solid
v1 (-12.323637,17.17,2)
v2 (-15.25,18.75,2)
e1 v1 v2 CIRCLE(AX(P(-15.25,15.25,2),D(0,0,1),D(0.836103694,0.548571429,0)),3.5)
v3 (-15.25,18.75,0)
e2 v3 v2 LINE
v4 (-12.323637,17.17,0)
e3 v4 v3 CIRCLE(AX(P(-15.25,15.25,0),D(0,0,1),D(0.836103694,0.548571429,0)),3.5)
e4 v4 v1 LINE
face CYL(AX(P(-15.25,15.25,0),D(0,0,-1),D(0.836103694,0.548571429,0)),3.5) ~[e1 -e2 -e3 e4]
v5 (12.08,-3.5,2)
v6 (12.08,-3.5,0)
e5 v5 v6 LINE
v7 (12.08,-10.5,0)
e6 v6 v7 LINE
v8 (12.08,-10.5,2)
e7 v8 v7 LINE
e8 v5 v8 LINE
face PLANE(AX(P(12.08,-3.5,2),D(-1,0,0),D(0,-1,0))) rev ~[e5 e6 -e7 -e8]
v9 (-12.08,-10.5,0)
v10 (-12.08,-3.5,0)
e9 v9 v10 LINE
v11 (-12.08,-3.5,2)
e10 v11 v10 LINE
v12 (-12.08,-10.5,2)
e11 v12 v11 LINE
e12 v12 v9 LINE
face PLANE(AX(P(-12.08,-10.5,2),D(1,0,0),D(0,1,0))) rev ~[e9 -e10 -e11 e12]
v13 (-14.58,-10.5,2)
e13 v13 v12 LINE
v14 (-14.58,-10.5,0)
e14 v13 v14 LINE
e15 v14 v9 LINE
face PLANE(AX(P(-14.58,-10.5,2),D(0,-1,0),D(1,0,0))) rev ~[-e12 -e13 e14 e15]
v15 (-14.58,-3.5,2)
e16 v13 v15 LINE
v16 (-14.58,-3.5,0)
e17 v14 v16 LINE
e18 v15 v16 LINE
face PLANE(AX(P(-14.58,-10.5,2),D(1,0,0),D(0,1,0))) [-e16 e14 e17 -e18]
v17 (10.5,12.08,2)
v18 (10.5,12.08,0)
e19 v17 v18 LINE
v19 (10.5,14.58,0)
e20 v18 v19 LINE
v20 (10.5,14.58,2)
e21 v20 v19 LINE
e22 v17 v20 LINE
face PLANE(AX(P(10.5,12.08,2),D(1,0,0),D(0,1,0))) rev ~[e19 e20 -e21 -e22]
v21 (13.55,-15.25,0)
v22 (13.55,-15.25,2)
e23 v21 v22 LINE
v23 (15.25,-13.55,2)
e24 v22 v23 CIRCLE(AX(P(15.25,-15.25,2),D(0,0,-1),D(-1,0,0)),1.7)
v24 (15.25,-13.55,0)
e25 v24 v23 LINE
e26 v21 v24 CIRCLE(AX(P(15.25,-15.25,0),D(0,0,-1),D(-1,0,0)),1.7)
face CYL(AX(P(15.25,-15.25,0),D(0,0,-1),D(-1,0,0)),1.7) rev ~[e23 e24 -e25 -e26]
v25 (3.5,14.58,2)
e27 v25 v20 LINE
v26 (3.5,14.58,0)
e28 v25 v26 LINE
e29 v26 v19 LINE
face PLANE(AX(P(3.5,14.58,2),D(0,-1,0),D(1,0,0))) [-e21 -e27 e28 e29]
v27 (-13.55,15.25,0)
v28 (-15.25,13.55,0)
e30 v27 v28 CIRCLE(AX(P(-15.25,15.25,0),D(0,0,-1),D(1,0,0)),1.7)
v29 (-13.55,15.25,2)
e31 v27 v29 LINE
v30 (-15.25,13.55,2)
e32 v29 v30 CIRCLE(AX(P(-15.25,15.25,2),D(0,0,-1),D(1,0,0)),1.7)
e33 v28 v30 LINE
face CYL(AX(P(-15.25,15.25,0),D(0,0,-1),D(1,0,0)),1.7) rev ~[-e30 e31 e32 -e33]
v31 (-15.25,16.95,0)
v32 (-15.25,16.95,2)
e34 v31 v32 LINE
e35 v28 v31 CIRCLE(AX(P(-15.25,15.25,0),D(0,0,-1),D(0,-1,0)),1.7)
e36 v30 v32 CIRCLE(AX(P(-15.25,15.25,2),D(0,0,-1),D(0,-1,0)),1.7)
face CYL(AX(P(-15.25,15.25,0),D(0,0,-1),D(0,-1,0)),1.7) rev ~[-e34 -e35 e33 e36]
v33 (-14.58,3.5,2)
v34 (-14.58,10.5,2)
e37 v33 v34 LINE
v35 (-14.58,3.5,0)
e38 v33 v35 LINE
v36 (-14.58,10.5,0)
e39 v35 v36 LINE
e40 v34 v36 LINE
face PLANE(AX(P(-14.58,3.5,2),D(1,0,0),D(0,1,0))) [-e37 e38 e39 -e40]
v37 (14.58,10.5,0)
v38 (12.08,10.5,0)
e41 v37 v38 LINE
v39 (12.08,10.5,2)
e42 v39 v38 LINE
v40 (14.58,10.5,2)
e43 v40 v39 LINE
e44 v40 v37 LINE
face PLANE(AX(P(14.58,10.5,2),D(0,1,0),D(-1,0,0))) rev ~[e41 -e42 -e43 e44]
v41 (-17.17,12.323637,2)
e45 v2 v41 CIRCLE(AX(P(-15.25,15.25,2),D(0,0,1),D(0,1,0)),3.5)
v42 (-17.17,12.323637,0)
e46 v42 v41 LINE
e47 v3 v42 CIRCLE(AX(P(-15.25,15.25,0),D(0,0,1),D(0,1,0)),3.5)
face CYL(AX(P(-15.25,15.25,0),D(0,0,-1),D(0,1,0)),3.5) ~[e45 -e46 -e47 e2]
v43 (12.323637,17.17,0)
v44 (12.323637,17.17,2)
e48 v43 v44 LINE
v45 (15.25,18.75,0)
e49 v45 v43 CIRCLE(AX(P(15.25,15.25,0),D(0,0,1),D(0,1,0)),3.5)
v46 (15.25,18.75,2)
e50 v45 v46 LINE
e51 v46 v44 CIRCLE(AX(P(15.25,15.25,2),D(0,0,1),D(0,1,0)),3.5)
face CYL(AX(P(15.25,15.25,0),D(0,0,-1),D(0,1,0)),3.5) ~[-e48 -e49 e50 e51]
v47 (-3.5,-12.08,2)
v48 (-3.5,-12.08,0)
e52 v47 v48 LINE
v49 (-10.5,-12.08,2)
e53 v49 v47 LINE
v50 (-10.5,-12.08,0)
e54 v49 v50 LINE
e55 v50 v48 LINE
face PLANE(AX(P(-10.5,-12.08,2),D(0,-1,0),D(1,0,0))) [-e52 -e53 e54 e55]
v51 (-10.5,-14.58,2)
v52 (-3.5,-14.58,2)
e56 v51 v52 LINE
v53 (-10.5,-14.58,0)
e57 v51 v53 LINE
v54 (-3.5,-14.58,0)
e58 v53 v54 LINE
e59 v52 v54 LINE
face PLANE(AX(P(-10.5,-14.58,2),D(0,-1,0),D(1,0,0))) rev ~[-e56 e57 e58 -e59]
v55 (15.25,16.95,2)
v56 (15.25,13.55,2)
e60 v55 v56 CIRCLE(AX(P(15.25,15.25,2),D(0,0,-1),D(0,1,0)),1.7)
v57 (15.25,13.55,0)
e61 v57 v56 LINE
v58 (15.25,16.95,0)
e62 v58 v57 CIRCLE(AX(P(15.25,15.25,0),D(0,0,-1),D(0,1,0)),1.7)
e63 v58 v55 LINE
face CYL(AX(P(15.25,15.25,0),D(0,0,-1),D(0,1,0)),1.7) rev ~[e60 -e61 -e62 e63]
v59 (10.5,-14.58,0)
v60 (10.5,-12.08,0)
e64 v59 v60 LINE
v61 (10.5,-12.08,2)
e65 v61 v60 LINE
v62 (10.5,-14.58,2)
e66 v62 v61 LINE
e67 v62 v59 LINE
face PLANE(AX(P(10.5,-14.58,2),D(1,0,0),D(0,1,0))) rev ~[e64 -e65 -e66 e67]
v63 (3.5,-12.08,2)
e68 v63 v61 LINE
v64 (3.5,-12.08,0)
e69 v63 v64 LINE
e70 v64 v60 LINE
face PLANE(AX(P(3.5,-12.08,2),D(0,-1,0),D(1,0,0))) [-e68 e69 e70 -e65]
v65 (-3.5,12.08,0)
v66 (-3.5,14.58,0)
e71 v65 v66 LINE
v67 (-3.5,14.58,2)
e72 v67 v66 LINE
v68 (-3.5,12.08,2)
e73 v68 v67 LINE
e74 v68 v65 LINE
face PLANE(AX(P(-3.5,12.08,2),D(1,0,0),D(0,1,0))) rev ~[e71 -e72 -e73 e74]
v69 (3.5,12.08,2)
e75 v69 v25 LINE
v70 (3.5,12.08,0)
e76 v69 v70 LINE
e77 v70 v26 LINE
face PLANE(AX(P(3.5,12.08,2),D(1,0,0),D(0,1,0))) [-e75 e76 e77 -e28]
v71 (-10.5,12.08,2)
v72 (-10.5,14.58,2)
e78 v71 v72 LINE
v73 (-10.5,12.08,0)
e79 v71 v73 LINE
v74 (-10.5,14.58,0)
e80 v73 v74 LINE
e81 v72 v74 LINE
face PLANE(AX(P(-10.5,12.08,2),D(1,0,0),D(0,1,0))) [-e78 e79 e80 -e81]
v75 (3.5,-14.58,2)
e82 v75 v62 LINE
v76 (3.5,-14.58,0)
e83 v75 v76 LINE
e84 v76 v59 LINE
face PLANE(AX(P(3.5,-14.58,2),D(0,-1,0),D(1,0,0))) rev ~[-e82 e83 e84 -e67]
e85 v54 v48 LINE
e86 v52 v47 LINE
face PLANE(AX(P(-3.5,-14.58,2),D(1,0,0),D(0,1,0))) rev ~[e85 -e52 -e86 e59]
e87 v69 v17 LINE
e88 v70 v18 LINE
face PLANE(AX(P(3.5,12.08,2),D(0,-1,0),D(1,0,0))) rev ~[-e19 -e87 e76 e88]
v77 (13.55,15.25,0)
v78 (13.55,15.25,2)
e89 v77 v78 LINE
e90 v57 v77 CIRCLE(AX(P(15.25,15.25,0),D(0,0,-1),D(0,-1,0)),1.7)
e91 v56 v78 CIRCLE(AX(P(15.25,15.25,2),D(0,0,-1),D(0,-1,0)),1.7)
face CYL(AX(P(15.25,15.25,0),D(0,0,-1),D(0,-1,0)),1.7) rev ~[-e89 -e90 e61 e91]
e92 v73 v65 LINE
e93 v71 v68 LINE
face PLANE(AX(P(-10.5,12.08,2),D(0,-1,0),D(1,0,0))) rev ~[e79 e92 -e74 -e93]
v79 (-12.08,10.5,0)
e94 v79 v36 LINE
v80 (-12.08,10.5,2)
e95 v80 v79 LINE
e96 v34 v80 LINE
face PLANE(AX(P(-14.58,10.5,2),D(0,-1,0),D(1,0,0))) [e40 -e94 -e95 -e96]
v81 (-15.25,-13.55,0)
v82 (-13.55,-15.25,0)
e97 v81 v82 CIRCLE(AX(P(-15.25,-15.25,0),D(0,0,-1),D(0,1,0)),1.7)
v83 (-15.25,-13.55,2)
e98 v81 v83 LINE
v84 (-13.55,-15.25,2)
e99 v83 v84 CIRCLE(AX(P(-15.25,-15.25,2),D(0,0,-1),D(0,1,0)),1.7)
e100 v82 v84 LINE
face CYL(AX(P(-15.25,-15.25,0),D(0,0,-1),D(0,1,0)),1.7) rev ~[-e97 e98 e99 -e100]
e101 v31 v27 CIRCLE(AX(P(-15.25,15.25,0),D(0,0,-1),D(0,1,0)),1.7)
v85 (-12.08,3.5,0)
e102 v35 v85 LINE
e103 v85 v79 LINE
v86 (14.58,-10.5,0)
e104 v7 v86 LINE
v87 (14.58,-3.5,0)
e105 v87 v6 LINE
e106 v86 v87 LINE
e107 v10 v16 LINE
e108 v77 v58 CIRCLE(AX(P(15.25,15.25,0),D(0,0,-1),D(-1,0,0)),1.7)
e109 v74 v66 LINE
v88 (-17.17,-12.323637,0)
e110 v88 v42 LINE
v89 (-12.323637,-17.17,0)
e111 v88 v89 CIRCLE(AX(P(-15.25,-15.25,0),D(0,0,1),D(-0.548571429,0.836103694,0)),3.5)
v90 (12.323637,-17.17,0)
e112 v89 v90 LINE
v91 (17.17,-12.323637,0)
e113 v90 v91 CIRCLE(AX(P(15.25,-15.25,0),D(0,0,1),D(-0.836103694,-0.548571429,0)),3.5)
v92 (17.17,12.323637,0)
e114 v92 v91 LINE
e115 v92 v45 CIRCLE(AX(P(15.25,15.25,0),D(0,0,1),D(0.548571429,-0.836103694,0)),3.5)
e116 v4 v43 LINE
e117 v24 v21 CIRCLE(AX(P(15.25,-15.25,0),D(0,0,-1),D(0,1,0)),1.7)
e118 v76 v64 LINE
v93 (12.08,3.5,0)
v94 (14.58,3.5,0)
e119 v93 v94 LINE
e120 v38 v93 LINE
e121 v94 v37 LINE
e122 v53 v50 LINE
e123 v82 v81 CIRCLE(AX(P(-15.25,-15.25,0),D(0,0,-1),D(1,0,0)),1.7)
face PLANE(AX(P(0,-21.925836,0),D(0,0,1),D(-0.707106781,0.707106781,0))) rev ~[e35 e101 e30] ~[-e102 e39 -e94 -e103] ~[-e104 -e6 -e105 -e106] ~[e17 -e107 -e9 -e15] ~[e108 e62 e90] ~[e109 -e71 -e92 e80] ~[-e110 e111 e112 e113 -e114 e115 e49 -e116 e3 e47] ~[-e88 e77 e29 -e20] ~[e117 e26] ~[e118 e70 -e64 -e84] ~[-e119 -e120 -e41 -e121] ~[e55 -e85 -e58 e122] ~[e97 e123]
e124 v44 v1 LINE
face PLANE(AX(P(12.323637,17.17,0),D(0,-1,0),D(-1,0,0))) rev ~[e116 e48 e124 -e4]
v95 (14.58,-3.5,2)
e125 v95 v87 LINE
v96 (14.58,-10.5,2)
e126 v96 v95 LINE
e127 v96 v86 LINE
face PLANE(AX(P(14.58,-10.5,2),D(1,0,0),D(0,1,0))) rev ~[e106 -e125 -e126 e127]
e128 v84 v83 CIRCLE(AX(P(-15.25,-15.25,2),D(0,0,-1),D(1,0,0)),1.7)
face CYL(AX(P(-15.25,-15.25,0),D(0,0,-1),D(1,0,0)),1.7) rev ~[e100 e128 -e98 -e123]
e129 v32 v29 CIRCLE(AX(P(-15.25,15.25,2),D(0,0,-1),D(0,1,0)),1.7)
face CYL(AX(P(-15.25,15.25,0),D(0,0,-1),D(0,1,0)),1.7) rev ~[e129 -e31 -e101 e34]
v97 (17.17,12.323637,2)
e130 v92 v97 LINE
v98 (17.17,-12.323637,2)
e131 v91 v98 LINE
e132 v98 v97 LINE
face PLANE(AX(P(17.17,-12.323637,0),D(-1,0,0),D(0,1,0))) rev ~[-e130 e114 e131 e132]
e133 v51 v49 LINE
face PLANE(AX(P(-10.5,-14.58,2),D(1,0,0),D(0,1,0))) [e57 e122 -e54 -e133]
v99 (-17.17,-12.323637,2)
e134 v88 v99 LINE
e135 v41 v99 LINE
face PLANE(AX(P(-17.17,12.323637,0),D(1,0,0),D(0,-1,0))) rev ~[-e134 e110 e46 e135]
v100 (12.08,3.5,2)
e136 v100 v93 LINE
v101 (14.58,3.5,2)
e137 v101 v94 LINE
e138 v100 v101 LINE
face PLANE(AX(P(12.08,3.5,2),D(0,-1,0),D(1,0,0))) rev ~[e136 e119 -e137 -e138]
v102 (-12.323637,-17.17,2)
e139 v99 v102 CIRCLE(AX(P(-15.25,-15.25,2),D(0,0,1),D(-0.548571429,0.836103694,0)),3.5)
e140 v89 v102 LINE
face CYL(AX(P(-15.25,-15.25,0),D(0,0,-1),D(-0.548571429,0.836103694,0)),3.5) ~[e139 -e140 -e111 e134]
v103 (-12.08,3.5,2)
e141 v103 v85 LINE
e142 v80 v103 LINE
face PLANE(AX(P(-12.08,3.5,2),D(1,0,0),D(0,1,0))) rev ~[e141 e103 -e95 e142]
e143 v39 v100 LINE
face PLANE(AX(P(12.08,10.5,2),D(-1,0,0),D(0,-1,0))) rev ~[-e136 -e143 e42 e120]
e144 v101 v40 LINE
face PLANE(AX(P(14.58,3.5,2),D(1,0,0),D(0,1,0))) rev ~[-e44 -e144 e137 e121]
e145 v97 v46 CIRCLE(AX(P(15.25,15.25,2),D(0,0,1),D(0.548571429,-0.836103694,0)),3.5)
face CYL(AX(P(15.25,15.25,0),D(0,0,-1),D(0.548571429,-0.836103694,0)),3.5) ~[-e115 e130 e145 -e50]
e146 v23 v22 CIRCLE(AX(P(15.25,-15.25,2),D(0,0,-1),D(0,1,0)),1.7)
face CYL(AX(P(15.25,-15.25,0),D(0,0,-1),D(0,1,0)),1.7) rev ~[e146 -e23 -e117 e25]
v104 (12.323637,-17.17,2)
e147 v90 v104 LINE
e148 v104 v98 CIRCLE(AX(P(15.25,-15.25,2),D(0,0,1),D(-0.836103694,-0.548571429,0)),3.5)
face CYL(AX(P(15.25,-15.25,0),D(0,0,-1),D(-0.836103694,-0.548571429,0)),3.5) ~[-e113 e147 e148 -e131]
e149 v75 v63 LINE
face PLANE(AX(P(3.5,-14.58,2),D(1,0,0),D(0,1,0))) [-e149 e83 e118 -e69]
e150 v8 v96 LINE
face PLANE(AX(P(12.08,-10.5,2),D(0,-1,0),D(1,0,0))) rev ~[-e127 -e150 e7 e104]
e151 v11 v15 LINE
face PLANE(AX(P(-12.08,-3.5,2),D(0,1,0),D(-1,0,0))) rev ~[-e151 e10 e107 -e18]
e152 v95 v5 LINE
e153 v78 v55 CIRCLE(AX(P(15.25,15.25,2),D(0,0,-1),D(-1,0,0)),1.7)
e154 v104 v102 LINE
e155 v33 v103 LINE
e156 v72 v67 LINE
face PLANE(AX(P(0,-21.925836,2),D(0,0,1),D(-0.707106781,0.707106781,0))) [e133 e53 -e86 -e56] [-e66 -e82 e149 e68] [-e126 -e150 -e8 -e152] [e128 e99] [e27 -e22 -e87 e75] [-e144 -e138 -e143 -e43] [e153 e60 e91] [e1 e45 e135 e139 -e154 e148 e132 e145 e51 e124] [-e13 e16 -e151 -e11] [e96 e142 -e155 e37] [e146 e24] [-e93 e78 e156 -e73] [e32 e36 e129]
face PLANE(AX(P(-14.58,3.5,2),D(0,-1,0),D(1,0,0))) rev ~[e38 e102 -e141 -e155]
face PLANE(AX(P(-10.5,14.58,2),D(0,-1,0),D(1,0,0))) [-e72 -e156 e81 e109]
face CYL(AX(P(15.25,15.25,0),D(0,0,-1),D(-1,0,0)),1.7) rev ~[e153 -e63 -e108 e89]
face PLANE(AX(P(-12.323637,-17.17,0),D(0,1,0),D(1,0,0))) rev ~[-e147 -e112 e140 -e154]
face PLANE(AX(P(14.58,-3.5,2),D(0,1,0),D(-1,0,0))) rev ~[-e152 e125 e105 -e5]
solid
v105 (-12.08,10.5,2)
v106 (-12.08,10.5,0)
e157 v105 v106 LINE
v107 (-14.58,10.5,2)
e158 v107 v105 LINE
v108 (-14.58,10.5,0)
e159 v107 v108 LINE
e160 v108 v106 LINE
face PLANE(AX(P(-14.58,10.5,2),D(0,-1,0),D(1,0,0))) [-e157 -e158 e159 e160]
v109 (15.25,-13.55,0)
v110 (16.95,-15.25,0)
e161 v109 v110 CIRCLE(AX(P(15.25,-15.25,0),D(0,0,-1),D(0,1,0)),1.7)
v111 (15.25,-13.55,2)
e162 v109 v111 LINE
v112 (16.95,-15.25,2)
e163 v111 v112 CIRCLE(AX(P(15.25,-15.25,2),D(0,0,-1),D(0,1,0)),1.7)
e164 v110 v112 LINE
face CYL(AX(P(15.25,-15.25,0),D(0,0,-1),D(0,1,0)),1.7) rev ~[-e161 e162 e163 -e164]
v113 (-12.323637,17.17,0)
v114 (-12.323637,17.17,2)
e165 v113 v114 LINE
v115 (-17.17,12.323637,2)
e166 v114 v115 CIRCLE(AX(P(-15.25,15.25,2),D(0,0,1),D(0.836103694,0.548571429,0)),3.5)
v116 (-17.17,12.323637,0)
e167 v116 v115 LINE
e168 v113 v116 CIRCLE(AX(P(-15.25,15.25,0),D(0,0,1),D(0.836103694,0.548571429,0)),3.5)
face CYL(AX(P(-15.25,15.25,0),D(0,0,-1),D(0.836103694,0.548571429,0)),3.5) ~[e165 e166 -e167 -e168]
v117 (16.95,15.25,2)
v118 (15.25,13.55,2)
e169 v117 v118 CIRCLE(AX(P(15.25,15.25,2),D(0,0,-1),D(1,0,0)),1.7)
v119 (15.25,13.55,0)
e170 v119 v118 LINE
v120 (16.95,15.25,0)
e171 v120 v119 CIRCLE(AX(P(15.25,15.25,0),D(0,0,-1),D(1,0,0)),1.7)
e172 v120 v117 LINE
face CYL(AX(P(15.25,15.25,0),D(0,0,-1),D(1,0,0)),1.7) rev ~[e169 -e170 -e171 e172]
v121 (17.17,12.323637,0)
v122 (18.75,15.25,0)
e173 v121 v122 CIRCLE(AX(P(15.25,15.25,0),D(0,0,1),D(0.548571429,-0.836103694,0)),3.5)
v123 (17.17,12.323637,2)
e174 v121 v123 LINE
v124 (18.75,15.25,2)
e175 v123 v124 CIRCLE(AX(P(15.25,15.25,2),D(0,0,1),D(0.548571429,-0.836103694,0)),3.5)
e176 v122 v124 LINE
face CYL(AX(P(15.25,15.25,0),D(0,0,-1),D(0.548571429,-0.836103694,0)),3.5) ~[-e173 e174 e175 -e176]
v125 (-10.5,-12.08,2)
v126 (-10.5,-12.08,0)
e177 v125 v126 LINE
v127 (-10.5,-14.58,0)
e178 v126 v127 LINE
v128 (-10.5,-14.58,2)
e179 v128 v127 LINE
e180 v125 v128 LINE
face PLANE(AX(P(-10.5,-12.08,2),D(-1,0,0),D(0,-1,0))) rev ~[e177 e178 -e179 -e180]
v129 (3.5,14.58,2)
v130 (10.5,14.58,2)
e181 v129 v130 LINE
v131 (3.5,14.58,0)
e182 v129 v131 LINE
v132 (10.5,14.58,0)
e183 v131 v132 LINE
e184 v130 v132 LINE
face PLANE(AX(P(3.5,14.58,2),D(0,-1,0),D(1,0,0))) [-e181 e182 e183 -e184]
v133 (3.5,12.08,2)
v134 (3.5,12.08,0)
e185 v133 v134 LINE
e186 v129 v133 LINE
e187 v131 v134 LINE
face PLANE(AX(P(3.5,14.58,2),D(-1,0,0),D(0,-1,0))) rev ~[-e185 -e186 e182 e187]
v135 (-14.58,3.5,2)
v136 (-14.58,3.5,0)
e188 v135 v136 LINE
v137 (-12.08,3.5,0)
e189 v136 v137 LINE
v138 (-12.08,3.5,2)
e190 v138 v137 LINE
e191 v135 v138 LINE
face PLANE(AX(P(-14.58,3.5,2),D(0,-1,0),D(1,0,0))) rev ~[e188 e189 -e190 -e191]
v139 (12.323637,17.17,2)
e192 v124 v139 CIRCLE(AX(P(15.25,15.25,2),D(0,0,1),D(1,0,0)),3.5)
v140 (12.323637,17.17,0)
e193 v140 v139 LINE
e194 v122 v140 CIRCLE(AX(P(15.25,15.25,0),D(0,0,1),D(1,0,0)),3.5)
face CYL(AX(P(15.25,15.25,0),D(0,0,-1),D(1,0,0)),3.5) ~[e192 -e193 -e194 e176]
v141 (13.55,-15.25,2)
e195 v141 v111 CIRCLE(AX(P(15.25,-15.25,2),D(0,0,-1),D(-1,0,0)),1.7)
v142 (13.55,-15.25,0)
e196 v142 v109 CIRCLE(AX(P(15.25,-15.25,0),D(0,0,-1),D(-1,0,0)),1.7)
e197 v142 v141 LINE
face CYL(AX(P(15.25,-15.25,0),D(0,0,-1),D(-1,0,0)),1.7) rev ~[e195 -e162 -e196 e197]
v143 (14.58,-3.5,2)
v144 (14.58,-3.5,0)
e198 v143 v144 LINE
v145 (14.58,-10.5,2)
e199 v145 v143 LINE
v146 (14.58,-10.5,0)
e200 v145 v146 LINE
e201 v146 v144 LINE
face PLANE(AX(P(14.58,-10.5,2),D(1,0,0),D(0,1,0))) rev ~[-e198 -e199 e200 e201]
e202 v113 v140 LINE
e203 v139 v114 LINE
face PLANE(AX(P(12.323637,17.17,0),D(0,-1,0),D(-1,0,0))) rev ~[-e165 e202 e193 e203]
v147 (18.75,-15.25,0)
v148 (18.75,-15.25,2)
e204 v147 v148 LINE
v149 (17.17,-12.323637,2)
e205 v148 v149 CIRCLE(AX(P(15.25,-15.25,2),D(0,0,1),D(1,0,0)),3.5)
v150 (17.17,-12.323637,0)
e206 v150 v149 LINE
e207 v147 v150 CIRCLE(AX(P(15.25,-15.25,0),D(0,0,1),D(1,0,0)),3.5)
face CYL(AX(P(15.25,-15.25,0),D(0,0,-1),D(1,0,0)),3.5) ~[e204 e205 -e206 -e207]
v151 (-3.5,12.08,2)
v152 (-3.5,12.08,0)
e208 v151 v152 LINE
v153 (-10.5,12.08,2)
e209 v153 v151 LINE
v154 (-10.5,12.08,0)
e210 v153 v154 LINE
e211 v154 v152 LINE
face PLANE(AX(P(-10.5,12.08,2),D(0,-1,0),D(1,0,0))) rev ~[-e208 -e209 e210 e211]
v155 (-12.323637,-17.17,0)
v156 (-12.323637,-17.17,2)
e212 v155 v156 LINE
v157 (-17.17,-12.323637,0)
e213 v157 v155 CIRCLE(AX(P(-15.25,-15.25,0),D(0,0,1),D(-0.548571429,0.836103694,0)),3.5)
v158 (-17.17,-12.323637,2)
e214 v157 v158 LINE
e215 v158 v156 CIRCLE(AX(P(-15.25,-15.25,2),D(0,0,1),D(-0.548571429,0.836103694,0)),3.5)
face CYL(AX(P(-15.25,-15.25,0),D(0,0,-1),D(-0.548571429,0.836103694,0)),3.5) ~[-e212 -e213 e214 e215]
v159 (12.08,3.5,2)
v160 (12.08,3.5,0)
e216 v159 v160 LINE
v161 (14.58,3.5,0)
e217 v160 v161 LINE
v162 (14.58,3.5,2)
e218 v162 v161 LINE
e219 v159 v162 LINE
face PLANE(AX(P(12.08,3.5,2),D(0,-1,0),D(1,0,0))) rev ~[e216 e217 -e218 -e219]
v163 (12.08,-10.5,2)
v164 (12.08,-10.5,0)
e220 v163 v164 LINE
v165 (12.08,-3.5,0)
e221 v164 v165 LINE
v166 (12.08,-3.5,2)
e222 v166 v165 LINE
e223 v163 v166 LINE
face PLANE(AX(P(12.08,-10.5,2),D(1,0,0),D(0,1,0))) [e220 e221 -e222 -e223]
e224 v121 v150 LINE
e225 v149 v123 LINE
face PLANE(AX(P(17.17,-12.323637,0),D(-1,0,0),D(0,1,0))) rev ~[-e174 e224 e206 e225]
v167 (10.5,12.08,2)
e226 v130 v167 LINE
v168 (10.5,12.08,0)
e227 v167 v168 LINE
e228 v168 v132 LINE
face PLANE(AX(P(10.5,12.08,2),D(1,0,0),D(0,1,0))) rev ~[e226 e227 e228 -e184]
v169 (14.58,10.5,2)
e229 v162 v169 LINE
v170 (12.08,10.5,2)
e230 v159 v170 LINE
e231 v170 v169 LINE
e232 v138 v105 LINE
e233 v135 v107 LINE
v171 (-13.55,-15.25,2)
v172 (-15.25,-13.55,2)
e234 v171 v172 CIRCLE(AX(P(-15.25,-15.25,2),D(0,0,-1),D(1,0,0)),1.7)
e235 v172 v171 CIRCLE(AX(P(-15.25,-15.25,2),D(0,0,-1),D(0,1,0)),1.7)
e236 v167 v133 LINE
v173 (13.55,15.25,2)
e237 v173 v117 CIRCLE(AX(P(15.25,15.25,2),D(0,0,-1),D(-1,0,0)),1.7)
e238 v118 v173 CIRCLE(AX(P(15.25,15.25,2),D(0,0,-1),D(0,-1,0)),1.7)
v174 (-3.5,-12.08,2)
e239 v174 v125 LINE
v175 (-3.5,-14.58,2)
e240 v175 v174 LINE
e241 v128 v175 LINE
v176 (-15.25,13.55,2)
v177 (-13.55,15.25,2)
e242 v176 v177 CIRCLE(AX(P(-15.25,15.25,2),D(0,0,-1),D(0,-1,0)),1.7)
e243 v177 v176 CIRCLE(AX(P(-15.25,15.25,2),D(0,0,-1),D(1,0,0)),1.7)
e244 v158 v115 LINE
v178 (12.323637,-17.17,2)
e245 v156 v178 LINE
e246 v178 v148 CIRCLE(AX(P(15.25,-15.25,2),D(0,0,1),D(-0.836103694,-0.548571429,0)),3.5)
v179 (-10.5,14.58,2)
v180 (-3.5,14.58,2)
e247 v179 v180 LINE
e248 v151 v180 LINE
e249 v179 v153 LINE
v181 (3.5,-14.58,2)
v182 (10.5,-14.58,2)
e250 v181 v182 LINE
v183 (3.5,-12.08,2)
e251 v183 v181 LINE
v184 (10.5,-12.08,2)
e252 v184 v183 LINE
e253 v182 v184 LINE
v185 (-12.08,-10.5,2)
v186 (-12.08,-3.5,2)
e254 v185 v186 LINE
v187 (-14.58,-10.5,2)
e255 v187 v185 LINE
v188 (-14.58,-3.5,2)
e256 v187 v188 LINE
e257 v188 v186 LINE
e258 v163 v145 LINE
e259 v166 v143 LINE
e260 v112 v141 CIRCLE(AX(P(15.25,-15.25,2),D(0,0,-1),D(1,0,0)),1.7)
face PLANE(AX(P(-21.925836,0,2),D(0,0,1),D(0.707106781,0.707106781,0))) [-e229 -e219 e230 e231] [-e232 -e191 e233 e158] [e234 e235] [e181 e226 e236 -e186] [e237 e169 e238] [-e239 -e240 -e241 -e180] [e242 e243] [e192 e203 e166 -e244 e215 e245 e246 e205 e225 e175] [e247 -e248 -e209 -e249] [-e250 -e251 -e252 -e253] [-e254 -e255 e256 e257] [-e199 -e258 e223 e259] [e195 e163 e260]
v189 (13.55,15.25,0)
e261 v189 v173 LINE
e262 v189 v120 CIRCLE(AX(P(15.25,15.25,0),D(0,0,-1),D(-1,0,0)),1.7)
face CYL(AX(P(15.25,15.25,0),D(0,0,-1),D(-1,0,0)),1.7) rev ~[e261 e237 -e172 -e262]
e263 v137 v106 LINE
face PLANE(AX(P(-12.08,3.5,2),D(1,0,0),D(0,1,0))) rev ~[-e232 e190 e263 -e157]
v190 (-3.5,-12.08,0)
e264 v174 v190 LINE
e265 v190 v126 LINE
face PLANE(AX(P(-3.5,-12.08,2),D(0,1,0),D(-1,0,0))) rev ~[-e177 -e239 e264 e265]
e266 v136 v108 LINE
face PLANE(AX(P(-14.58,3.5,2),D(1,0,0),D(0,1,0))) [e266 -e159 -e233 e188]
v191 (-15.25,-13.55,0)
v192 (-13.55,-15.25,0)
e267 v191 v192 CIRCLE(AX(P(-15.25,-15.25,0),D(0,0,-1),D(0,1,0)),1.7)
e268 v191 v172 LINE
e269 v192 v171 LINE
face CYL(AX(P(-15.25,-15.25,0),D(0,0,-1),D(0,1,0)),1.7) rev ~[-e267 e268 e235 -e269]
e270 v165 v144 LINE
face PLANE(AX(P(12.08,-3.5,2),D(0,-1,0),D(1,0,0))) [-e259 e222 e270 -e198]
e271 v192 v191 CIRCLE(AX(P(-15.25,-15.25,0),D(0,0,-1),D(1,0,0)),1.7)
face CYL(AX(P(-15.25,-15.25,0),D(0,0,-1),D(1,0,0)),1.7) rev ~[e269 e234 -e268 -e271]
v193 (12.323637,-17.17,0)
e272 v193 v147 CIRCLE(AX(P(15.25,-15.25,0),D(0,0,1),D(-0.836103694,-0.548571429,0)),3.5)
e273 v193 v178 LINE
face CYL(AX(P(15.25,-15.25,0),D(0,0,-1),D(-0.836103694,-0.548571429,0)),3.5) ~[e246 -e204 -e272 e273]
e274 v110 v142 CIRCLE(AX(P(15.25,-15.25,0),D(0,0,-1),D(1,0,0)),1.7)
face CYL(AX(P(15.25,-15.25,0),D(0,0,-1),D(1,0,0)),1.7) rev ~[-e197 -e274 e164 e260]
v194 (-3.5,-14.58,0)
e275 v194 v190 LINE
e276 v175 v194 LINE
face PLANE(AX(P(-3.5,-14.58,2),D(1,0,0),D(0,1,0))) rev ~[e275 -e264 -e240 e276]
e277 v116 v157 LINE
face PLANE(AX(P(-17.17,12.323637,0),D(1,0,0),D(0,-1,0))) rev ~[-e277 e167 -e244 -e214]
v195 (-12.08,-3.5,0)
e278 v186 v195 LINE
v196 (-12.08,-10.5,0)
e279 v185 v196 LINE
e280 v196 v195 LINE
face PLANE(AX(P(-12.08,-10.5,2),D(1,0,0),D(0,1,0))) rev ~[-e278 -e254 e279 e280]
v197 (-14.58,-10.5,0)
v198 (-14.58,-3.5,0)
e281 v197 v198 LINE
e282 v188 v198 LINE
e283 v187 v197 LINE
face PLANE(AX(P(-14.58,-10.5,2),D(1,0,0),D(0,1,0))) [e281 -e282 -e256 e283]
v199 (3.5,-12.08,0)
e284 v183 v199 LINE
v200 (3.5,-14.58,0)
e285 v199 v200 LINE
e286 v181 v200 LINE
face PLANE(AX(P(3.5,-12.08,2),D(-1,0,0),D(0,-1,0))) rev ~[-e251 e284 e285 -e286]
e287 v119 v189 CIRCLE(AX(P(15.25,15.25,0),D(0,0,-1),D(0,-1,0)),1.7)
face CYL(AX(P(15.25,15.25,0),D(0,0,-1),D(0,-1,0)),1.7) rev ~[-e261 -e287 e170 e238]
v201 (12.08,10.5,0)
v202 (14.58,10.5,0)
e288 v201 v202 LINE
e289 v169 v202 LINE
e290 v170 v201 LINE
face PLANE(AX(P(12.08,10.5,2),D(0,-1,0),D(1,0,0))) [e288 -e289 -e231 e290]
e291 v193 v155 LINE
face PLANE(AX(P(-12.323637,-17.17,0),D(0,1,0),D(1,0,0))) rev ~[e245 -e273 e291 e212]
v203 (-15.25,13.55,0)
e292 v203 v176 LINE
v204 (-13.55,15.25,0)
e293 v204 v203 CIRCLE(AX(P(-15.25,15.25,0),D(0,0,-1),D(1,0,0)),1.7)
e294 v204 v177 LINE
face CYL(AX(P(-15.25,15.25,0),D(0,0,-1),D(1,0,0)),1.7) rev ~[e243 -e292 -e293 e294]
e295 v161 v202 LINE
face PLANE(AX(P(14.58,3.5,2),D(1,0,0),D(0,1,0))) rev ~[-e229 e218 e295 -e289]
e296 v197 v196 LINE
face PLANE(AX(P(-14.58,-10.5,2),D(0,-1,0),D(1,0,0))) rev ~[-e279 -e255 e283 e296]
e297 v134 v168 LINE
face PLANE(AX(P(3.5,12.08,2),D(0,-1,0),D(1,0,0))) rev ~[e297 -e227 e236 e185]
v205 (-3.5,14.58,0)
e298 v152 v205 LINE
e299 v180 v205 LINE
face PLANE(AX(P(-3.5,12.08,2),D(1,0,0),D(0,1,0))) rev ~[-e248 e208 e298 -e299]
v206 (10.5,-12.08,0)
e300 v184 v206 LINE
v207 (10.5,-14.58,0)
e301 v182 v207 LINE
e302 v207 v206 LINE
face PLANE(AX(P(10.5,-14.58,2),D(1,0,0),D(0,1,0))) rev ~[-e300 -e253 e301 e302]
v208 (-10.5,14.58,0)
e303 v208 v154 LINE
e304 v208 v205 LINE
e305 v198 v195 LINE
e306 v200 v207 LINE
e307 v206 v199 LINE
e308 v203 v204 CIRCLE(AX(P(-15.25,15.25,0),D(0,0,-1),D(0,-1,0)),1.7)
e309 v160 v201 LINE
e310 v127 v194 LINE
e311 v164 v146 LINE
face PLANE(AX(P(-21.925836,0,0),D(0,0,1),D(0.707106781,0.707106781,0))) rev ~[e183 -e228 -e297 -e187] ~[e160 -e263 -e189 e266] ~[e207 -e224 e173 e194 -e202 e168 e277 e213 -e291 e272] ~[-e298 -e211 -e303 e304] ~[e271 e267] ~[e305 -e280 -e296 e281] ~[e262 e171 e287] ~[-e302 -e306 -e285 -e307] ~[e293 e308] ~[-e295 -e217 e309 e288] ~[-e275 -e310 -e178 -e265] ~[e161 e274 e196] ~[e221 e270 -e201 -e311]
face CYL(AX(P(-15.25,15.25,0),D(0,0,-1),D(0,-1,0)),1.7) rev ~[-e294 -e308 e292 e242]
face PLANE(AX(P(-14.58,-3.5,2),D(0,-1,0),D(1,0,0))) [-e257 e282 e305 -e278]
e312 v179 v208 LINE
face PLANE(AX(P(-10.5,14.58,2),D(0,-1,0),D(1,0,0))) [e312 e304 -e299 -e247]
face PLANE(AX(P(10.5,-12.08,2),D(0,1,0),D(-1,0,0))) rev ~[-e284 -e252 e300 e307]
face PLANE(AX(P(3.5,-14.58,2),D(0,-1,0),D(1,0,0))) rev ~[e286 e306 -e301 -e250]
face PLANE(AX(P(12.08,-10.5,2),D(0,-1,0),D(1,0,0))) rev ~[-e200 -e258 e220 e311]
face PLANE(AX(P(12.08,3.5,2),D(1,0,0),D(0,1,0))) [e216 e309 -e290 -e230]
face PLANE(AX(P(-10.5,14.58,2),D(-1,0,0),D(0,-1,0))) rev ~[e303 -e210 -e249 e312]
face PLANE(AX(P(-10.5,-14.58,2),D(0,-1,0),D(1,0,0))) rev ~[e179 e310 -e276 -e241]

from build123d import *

# Parameters (mm, degrees)
F2_DEPTH  = 2
F4_ANGLE  = 45
F8_R      = 1.7
F9_DEPTH  = 2.001
F10_W     = 7
F10_H     = 1.25
F11_DEPTH = 2.001
F12_ANGLE = 90
F13_W     = 7
F13_H     = 2.5
F13_W_2   = 2.5
F13_H_2   = 7
F14_DEPTH = 2.001


# Not quite as in the source:
# - a feature names something its author has since deleted; it is built from what else it names


with BuildPart() as f2:
    # F1 (on Top) → F2 (new body)
    with BuildSketch(Plane.XY):
        with BuildLine():
            ThreePointArc((-12.3236370697, 17.17), (-17.7248737342, 17.7248737342), (-17.17, 12.3236370697))
            ThreePointArc((-17.17, 12.3236370697), (-16.2519305724, 11.8964742243), (-15.25, 11.75))
            Line((-15.25, 11.75), (-15.25, 13.55))
            ThreePointArc((-15.25, 13.55), (-16.452081528, 16.452081528), (-13.55, 15.25))
            Line((-13.55, 15.25), (-11.75, 15.25))
            ThreePointArc((-11.75, 15.25), (-11.8964742243, 16.2519305724), (-12.3236370697, 17.17))
        make_face()
        with BuildLine():
            ThreePointArc((-15.25, 11.75), (-14.2480694276, 11.8964742243), (-13.33, 12.3236370697))
            ThreePointArc((-13.33, 12.3236370697), (-12.7751262658, 12.7751262658), (-12.3236370697, 13.33))
            ThreePointArc((-12.3236370697, 13.33), (-11.8964742243, 14.2480694276), (-11.75, 15.25))
            Line((-11.75, 15.25), (-13.55, 15.25))
            ThreePointArc((-13.55, 15.25), (-14.047918472, 14.047918472), (-15.25, 13.55))
            Line((-15.25, 13.55), (-15.25, 11.75))
        make_face()
        with BuildLine():
            Line((15.25, 13.55), (15.25, 11.75))
            ThreePointArc((15.25, 11.75), (16.2519305724, 11.8964742243), (17.17, 12.3236370697))
            ThreePointArc((17.17, 12.3236370697), (18.3297727189, 13.5871710852), (18.75, 15.25))
            ThreePointArc((18.75, 15.25), (16.2519305724, 18.6035257757), (12.3236370697, 17.17))
            ThreePointArc((12.3236370697, 17.17), (11.8964742243, 16.2519305724), (11.75, 15.25))
            Line((11.75, 15.25), (13.55, 15.25))
            ThreePointArc((13.55, 15.25), (15.25, 16.95), (16.95, 15.25))
            ThreePointArc((16.95, 15.25), (16.452081528, 14.047918472), (15.25, 13.55))
        make_face()
        with BuildLine():
            ThreePointArc((12.3236370697, 13.33), (12.7751262658, 12.7751262658), (13.33, 12.3236370697))
            ThreePointArc((13.33, 12.3236370697), (14.2480694276, 11.8964742243), (15.25, 11.75))
            Line((15.25, 11.75), (15.25, 13.55))
            ThreePointArc((15.25, 13.55), (14.047918472, 14.047918472), (13.55, 15.25))
            Line((13.55, 15.25), (11.75, 15.25))
            ThreePointArc((11.75, 15.25), (11.8964742243, 14.2480694276), (12.3236370697, 13.33))
        make_face()
        with BuildLine():
            Line((13.33, 12.3236370697), (13.33, -12.3236370697))
            ThreePointArc((13.33, -12.3236370697), (14.2480694276, -11.8964742243), (15.25, -11.75))
            Line((15.25, -11.75), (15.25, 11.75))
            ThreePointArc((15.25, 11.75), (14.2480694276, 11.8964742243), (13.33, 12.3236370697))
        make_face()
        with BuildLine():
            ThreePointArc((-11.75, 15.25), (-11.8964742243, 14.2480694276), (-12.3236370697, 13.33))
            Line((-12.3236370697, 13.33), (12.3236370697, 13.33))
            ThreePointArc((12.3236370697, 13.33), (11.8964742243, 14.2480694276), (11.75, 15.25))
            Line((11.75, 15.25), (-11.75, 15.25))
        make_face()
        with BuildLine():
            ThreePointArc((-15.25, -11.75), (-14.2480694276, -11.8964742243), (-13.33, -12.3236370697))
            Line((-13.33, -12.3236370697), (-13.33, 12.3236370697))
            ThreePointArc((-13.33, 12.3236370697), (-14.2480694276, 11.8964742243), (-15.25, 11.75))
            Line((-15.25, 11.75), (-15.25, -11.75))
        make_face()
        with BuildLine():
            Line((-17.17, 12.3236370697), (-17.17, -12.3236370697))
            ThreePointArc((-17.17, -12.3236370697), (-16.2519305724, -11.8964742243), (-15.25, -11.75))
            Line((-15.25, -11.75), (-15.25, 11.75))
            ThreePointArc((-15.25, 11.75), (-16.2519305724, 11.8964742243), (-17.17, 12.3236370697))
        make_face()
        with BuildLine():
            Line((15.25, 11.75), (15.25, -11.75))
            ThreePointArc((15.25, -11.75), (16.2519305724, -11.8964742243), (17.17, -12.3236370697))
            Line((17.17, -12.3236370697), (17.17, 12.3236370697))
            ThreePointArc((17.17, 12.3236370697), (16.2519305724, 11.8964742243), (15.25, 11.75))
        make_face()
        with BuildLine():
            ThreePointArc((-12.3236370697, -13.33), (-11.8964742243, -14.2480694276), (-11.75, -15.25))
            Line((-11.75, -15.25), (11.75, -15.25))
            ThreePointArc((11.75, -15.25), (11.8964742243, -14.2480694276), (12.3236370697, -13.33))
            Line((12.3236370697, -13.33), (-12.3236370697, -13.33))
        make_face()
        with BuildLine():
            Line((11.75, -15.25), (-11.75, -15.25))
            ThreePointArc((-11.75, -15.25), (-11.8964742243, -16.2519305724), (-12.3236370697, -17.17))
            Line((-12.3236370697, -17.17), (12.3236370697, -17.17))
            ThreePointArc((12.3236370697, -17.17), (11.8964742243, -16.2519305724), (11.75, -15.25))
        make_face()
        with BuildLine():
            Line((12.3236370697, 17.17), (-12.3236370697, 17.17))
            ThreePointArc((-12.3236370697, 17.17), (-11.8964742243, 16.2519305724), (-11.75, 15.25))
            Line((-11.75, 15.25), (11.75, 15.25))
            ThreePointArc((11.75, 15.25), (11.8964742243, 16.2519305724), (12.3236370697, 17.17))
        make_face()
        with BuildLine():
            ThreePointArc((-12.3236370697, -17.17), (-11.8964742243, -16.2519305724), (-11.75, -15.25))
            Line((-11.75, -15.25), (-13.55, -15.25))
            ThreePointArc((-13.55, -15.25), (-16.452081528, -16.452081528), (-15.25, -13.55))
            Line((-15.25, -13.55), (-15.25, -11.75))
            ThreePointArc((-15.25, -11.75), (-16.2519305724, -11.8964742243), (-17.17, -12.3236370697))
            ThreePointArc((-17.17, -12.3236370697), (-17.7248737342, -17.7248737342), (-12.3236370697, -17.17))
        make_face()
        with BuildLine():
            Line((-13.55, -15.25), (-11.75, -15.25))
            ThreePointArc((-11.75, -15.25), (-11.8964742243, -14.2480694276), (-12.3236370697, -13.33))
            ThreePointArc((-12.3236370697, -13.33), (-12.7751262658, -12.7751262658), (-13.33, -12.3236370697))
            ThreePointArc((-13.33, -12.3236370697), (-14.2480694276, -11.8964742243), (-15.25, -11.75))
            Line((-15.25, -11.75), (-15.25, -13.55))
            ThreePointArc((-15.25, -13.55), (-14.047918472, -14.047918472), (-13.55, -15.25))
        make_face()
        with BuildLine():
            ThreePointArc((12.3236370697, -13.33), (11.8964742243, -14.2480694276), (11.75, -15.25))
            Line((11.75, -15.25), (13.55, -15.25))
            ThreePointArc((13.55, -15.25), (14.047918472, -14.047918472), (15.25, -13.55))
            Line((15.25, -13.55), (15.25, -11.75))
            ThreePointArc((15.25, -11.75), (14.2480694276, -11.8964742243), (13.33, -12.3236370697))
            ThreePointArc((13.33, -12.3236370697), (12.7751262658, -12.7751262658), (12.3236370697, -13.33))
        make_face()
        with BuildLine():
            Line((13.55, -15.25), (11.75, -15.25))
            ThreePointArc((11.75, -15.25), (11.8964742243, -16.2519305724), (12.3236370697, -17.17))
            ThreePointArc((12.3236370697, -17.17), (16.2519305724, -18.6035257757), (18.75, -15.25))
            ThreePointArc((18.75, -15.25), (18.3297727189, -13.5871710852), (17.17, -12.3236370697))
            ThreePointArc((17.17, -12.3236370697), (16.2519305724, -11.8964742243), (15.25, -11.75))
            Line((15.25, -11.75), (15.25, -13.55))
            ThreePointArc((15.25, -13.55), (16.452081528, -14.047918472), (16.95, -15.25))
            ThreePointArc((16.95, -15.25), (15.25, -16.95), (13.55, -15.25))
        make_face()
        with BuildLine():
            ThreePointArc((-13.33, -12.3236370697), (-12.7751262658, -12.7751262658), (-12.3236370697, -13.33))
            Line((-12.3236370697, -13.33), (12.3236370697, -13.33))
            ThreePointArc((12.3236370697, -13.33), (12.7751262658, -12.7751262658), (13.33, -12.3236370697))
            Line((13.33, -12.3236370697), (13.33, 12.3236370697))
            ThreePointArc((13.33, 12.3236370697), (12.7751262658, 12.7751262658), (12.3236370697, 13.33))
            Line((12.3236370697, 13.33), (-12.3236370697, 13.33))
            ThreePointArc((-12.3236370697, 13.33), (-12.7751262658, 12.7751262658), (-13.33, 12.3236370697))
            Line((-13.33, 12.3236370697), (-13.33, -12.3236370697))
        make_face()
    extrude(amount=F2_DEPTH)


with BuildPart() as f4_1:
    # F4: copy of F2
    add(f2.part.rotate(Axis((0, 0, 43.582893908), (0, 0, 1)), F4_ANGLE))


with BuildPart() as f2_1:
    add(f2.part)

    # F5: union F4_1
    add(f4_1.part)

    # F8 (on face) → F9 (cut, through all)
    with BuildSketch(Plane.XY.offset(2)):
        with BuildLine():
            Line((-3.4268960921, 20.8551507738), (-7.1120468659, 17.17))
            Line((-7.1120468659, 17.17), (7.1120468659, 17.17))
            Line((7.1120468659, 17.17), (3.4268960921, 20.8551507738))
            ThreePointArc((3.4268960921, 20.8551507738), (0, 25.0667568262), (-3.4268960921, 20.8551507738))
        make_face()
        with Locations((0, 21.5667568262)):
            Circle(F8_R, mode=Mode.SUBTRACT)
        with BuildLine():
            Line((20.8551507738, 3.4268960921), (17.17, 7.1120468659))
            Line((17.17, 7.1120468659), (17.17, -7.1120468659))
            Line((17.17, -7.1120468659), (20.8551507738, -3.4268960921))
            ThreePointArc((20.8551507738, -3.4268960921), (25.0667568262, 0), (20.8551507738, 3.4268960921))
        make_face()
        with Locations((21.5667568262, 0)):
            Circle(F8_R, mode=Mode.SUBTRACT)
        with BuildLine():
            Line((7.1120468659, -17.17), (-7.1120468659, -17.17))
            Line((-7.1120468659, -17.17), (-3.4268960921, -20.8551507738))
            ThreePointArc((-3.4268960921, -20.8551507738), (0, -25.0667568262), (3.4268960921, -20.8551507738))
            Line((3.4268960921, -20.8551507738), (7.1120468659, -17.17))
        make_face()
        with Locations((0, -21.5667568262)):
            Circle(F8_R, mode=Mode.SUBTRACT)
        with BuildLine():
            Line((-17.17, -7.1120468659), (-17.17, 7.1120468659))
            Line((-17.17, 7.1120468659), (-20.8551507738, 3.4268960921))
            ThreePointArc((-20.8551507738, 3.4268960921), (-25.0667568262, 0), (-20.8551507738, -3.4268960921))
            Line((-20.8551507738, -3.4268960921), (-17.17, -7.1120468659))
        make_face()
        with Locations((-21.5667568262, 0)):
            Circle(F8_R, mode=Mode.SUBTRACT)
    extrude(amount=-F9_DEPTH, mode=Mode.SUBTRACT)

    # F10 (on face) → F11 (cut, through all)
    with BuildSketch(Plane.XY.offset(2)):
        Polygon((-9.3647099602, 12.08), (-3.5, 12.08), (-3.5, 13.33), (-10.5, 13.33), (-10.5, 13.2152900398), align=None)
        Polygon((-10.5, 12.08), (-9.3647099602, 12.08), (-10.5, 13.2152900398), align=None)
        with Locations((-7, 13.955)):
            Rectangle(F10_W, F10_H)
        Polygon((10.5, 13.33), (3.5, 13.33), (3.5, 12.08), (9.3647099602, 12.08), (10.5, 13.2152900398), align=None)
        with Locations((7, 13.955)):
            Rectangle(F10_W, F10_H)
        Polygon((10.5, -13.2152900398), (10.5, -12.08), (9.3647099602, -12.08), align=None)
        Polygon((10.5, -13.33), (10.5, -13.2152900398), (9.3647099602, -12.08), (3.5, -12.08), (3.5, -13.33), align=None)
        with Locations((7, -13.955)):
            Rectangle(F10_W, F10_H)
        Polygon((-10.5, -13.33), (-3.5, -13.33), (-3.5, -12.08), (-9.3647099602, -12.08), (-10.5, -13.2152900398), align=None)
        with Locations((-7, -13.955)):
            Rectangle(F10_W, F10_H)
        Polygon((-10.5, -13.2152900398), (-9.3647099602, -12.08), (-10.5, -12.08), align=None)
    extrude(amount=-F11_DEPTH, mode=Mode.SUBTRACT)


with BuildPart() as f12_1:
    # F12: copy of F2
    add(f2_1.part.rotate(Axis((0, 0, 43.582893908), (0, 0, 1)), F12_ANGLE))


with BuildPart() as f14_tool:
    # F13 (on face) → F14 (new body, through all)
    with BuildSketch(Plane.XY.offset(2)):
        with Locations((-7, 13.33)):
            Rectangle(F13_W, F13_H)
        with Locations((-13.33, 7)):
            Rectangle(F13_W_2, F13_H_2)
        with Locations((7, 13.33)):
            Rectangle(F13_W, F13_H)
        with Locations((13.33, 7)):
            Rectangle(F13_W_2, F13_H_2)
        with Locations((-13.33, -7)):
            Rectangle(F13_W_2, F13_H_2)
        with Locations((13.33, -7)):
            Rectangle(F13_W_2, F13_H_2)
        with Locations((7, -13.33)):
            Rectangle(F13_W, F13_H)
        with Locations((-7, -13.33)):
            Rectangle(F13_W, F13_H)
    extrude(amount=-F14_DEPTH)


with BuildPart() as f2_2:
    add(f2_1.part)

    # F14: cut by f14_tool
    add(f14_tool.part, mode=Mode.SUBTRACT)


with BuildPart() as f12_1_1:
    add(f12_1.part)

    # F14: cut by f14_tool
    add(f14_tool.part, mode=Mode.SUBTRACT)


solid = Compound([f2_2.part, f12_1_1.part])
